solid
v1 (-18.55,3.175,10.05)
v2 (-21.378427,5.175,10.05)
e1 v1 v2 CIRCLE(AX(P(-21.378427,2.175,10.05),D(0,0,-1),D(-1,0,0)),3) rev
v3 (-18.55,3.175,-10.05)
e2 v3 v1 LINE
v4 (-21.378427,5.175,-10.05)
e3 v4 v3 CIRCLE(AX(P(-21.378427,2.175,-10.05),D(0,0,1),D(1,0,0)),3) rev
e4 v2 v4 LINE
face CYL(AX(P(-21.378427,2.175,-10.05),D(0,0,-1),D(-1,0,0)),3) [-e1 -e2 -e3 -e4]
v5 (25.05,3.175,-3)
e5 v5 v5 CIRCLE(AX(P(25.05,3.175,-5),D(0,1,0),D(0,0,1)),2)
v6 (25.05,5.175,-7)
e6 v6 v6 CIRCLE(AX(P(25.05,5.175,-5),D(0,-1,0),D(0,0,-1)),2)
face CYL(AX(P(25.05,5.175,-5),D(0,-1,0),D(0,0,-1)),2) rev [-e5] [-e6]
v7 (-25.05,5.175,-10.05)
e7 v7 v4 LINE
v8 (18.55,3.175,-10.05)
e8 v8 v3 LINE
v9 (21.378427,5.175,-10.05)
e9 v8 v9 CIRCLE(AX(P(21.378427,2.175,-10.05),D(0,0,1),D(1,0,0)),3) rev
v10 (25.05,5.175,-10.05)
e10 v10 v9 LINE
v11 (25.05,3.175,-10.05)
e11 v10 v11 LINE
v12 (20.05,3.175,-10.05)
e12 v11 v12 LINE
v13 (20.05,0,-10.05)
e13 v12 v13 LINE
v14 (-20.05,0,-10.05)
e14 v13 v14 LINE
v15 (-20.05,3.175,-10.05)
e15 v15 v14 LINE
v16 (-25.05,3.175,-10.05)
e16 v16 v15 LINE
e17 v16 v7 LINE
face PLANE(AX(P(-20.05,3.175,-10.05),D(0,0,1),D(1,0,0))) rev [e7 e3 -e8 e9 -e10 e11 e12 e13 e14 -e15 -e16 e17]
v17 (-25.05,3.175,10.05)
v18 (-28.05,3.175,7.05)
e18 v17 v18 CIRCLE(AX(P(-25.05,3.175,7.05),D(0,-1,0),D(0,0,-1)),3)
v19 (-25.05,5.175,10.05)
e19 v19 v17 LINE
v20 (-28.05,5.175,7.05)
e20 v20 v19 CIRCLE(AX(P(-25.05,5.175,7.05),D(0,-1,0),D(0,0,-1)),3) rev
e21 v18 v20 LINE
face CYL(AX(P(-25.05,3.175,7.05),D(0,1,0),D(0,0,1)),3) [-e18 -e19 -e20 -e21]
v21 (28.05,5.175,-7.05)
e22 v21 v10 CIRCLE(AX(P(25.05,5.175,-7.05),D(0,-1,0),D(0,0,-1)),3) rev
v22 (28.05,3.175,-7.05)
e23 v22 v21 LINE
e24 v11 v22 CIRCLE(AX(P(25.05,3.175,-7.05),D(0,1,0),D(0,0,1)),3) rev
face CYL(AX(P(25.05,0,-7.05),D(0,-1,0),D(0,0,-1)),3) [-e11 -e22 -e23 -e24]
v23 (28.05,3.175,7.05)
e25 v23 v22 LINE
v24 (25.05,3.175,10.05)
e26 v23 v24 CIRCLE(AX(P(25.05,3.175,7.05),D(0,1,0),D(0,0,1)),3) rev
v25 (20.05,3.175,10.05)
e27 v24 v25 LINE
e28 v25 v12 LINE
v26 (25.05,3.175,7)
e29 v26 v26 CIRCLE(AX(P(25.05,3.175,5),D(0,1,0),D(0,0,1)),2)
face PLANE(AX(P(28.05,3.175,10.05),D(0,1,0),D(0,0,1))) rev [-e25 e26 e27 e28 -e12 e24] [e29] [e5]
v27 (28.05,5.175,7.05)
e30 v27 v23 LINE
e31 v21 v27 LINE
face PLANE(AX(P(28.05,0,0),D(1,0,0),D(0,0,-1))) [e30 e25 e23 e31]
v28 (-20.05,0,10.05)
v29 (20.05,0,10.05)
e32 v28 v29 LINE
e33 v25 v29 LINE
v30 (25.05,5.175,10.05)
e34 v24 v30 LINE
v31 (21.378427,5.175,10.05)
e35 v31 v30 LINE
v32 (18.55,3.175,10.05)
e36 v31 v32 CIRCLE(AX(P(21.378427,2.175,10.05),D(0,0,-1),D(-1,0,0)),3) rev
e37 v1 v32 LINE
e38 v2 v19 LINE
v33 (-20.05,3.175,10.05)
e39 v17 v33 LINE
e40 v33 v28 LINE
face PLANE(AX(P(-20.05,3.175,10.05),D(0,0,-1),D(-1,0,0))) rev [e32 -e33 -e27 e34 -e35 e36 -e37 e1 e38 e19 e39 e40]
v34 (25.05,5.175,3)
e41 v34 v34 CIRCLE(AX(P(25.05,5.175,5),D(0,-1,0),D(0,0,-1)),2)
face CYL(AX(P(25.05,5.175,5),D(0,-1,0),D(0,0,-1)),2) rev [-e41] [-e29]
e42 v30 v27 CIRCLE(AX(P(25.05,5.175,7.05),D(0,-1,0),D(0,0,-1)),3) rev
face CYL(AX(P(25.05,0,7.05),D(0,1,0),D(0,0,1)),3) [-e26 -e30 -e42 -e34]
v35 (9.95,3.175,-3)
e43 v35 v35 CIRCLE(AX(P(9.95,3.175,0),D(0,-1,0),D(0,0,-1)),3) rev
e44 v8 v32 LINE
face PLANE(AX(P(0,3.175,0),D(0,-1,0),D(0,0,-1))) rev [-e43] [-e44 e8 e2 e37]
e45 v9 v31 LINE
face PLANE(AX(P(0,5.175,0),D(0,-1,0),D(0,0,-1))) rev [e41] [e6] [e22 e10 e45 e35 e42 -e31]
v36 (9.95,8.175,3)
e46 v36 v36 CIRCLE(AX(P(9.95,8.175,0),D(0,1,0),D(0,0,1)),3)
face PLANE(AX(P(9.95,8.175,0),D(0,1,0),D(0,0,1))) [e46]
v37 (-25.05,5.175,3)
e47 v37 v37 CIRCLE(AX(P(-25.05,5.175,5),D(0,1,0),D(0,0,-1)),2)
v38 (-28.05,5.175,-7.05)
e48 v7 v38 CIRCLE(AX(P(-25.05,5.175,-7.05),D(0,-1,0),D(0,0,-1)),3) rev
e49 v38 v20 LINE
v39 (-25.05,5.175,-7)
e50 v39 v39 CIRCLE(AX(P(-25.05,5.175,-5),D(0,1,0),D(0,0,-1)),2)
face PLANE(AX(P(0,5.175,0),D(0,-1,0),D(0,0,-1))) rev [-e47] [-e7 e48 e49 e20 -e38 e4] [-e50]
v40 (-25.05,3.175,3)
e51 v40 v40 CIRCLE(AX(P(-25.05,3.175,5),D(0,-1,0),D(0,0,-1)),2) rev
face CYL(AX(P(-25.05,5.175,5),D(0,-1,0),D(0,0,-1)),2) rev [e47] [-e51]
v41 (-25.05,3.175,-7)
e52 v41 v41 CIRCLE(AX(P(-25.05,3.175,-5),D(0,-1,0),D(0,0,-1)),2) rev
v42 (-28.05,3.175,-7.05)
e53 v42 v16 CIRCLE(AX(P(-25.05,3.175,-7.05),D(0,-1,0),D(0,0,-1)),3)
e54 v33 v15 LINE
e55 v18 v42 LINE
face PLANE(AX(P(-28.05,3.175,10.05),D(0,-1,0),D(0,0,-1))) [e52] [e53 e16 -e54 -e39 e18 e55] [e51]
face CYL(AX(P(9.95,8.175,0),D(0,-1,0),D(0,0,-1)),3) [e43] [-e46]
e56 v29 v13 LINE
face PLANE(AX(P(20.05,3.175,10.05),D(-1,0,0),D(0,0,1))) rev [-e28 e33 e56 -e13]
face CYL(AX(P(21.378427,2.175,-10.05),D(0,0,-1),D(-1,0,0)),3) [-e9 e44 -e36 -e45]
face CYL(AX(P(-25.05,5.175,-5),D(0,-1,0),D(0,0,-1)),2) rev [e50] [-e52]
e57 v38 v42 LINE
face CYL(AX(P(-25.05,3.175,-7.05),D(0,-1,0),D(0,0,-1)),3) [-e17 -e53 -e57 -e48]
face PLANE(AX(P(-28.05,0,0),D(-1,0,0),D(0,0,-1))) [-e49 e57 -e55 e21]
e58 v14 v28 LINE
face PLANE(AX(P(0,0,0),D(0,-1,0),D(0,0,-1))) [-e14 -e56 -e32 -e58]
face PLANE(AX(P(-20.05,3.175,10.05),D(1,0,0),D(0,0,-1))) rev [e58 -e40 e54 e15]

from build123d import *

# Parameters (mm, degrees)
SKETCH1_W            = 40.1
SKETCH1_H            = 20.1
BOSS_EXTRUDE1_DEPTH  = 3.175
SKETCH2_W            = 1.5
SKETCH2_H            = 20.1
BOSS_EXTRUDE2_DEPTH  = 2
SKETCH3_W            = 20.1
SKETCH3_H            = 2
BOSS_EXTRUDE3_DEPTH  = 8
SKETCH4_R            = 2
CUT_EXTRUDE1_DEPTH   = 30.964739695
FILLET1_R            = 3
FILLET2_R            = 3
FILLET1_OF_MIRROR2_R = 3
FILLET2_OF_MIRROR2_R = 3
SKETCH5_R            = 3
BOSS_EXTRUDE4_DEPTH  = 5


with BuildPart() as part:
    # Sketch1 → Boss-Extrude1 (new body)
    with BuildSketch(Plane(origin=(0, 0, 0), x_dir=(1, 0, 0), z_dir=(0, 1, 0))):
        Rectangle(SKETCH1_W, SKETCH1_H)
    extrude(amount=BOSS_EXTRUDE1_DEPTH)

    # Sketch2 → Boss-Extrude2 (add)
    with BuildSketch(Plane(origin=(0, 3.175, 0), x_dir=(1, 0, 0), z_dir=(0, 1, 0))):
        with Locations((19.3, 0)):
            Rectangle(SKETCH2_W, SKETCH2_H)
    boss_extrude2 = extrude(amount=BOSS_EXTRUDE2_DEPTH)

    # Sketch3 → Boss-Extrude3 (add)
    with BuildSketch(Plane(origin=(20.05, 0, 0), x_dir=(0, 0, -1), z_dir=(1, 0, 0))):
        with Locations((0, 4.175)):
            Rectangle(SKETCH3_W, SKETCH3_H)
    boss_extrude3 = extrude(amount=BOSS_EXTRUDE3_DEPTH)

    # Sketch4 → Cut-Extrude1 (cut, symmetric)
    with BuildSketch(Plane.XZ.offset(-3.175)):
        with Locations(Location((25.05, 5, 0), (0, 0, 270))):
            Circle(SKETCH4_R)
        with Locations(Location((25.05, -5, 0), (0, 0, 270))):
            Circle(SKETCH4_R)
    cut_extrude1 = extrude(amount=CUT_EXTRUDE1_DEPTH, both=True, mode=Mode.SUBTRACT)

    # Fillet1
    # the kernel refuses this fillet: 3 mm, written as the material it takes off along each edge
    with BuildSketch(Plane(origin=(18.55, 5.175, -17.121067812), x_dir=(0, -1, 0), z_dir=(0, 0, 1))) as fillet1_piece_1:
        with BuildLine():
            CenterArc((3, 2.828427125), FILLET1_R, 180, 70.528779366)
            Line((0, 2.828427125), (-0.06, 2.828427125))
            Line((-0.06, 2.828427125), (-0.06, 0))
            Line((-0.06, 0), (0, -0.06))
            ThreePointArc((0, -0.06), (1, -0.06), (1.98, -0.056568542))
            Line((1.98, -0.056568542), (2, 0))
        make_face()
    extrude(amount=34.242135624, mode=Mode.SUBTRACT)

    # Fillet2
    fillet2_edges = [part.edges().sort_by_distance(p)[0] for p in [
        (28.05, 4.175, 10.05),
        (28.05, 4.175, -10.05),
    ]]
    fillet(fillet2_edges, radius=FILLET2_R)

    # Mirror2: Boss-Extrude2, Boss-Extrude3, Cut-Extrude1 across plane
    add(boss_extrude2.mirror(Plane(origin=(0, 0, 0), x_dir=(0, 0, 1), z_dir=(1, 0, 0))))
    add(boss_extrude3.mirror(Plane(origin=(0, 0, 0), x_dir=(0, 0, 1), z_dir=(1, 0, 0))))
    add(cut_extrude1.mirror(Plane(origin=(0, 0, 0), x_dir=(0, 0, 1), z_dir=(1, 0, 0))), mode=Mode.SUBTRACT)

    # Fillet1 of Mirror2
    # the kernel refuses this fillet: 3 mm, written as the material it takes off along each edge
    with BuildSketch(Plane(origin=(-18.55, 5.175, -17.121067812), x_dir=(-1, 0, 0), z_dir=(0, 0, 1))) as fillet1_of_mirror2_piece_1:
        with BuildLine():
            CenterArc((2.828427125, 3), FILLET1_OF_MIRROR2_R, 199.471220634, 70.528779366)
            Line((0, 2), (-0.056568542, 1.98))
            ThreePointArc((-0.056568542, 1.98), (-0.06, 1), (-0.06, 0))
            Line((-0.06, 0), (0, -0.06))
            Line((0, -0.06), (2.828427125, -0.06))
            Line((2.828427125, -0.06), (2.828427125, 0))
        make_face()
    extrude(amount=34.242135624, mode=Mode.SUBTRACT)

    # Fillet2 of Mirror2
    fillet2_of_mirror2_edges = [part.edges().sort_by_distance(p)[0] for p in [
        (-28.05, 4.175, 10.05),
        (-28.05, 4.175, -10.05),
    ]]
    fillet(fillet2_of_mirror2_edges, radius=FILLET2_OF_MIRROR2_R)

    # Sketch5 → Boss-Extrude4 (add)
    with BuildSketch(Plane(origin=(0, 3.175, 0), x_dir=(1, 0, 0), z_dir=(0, 1, 0))):
        with Locations(Location((9.95, 0, 0), (0, 0, 90))):
            Circle(SKETCH5_R)
    extrude(amount=BOSS_EXTRUDE4_DEPTH)


solid = part.part
